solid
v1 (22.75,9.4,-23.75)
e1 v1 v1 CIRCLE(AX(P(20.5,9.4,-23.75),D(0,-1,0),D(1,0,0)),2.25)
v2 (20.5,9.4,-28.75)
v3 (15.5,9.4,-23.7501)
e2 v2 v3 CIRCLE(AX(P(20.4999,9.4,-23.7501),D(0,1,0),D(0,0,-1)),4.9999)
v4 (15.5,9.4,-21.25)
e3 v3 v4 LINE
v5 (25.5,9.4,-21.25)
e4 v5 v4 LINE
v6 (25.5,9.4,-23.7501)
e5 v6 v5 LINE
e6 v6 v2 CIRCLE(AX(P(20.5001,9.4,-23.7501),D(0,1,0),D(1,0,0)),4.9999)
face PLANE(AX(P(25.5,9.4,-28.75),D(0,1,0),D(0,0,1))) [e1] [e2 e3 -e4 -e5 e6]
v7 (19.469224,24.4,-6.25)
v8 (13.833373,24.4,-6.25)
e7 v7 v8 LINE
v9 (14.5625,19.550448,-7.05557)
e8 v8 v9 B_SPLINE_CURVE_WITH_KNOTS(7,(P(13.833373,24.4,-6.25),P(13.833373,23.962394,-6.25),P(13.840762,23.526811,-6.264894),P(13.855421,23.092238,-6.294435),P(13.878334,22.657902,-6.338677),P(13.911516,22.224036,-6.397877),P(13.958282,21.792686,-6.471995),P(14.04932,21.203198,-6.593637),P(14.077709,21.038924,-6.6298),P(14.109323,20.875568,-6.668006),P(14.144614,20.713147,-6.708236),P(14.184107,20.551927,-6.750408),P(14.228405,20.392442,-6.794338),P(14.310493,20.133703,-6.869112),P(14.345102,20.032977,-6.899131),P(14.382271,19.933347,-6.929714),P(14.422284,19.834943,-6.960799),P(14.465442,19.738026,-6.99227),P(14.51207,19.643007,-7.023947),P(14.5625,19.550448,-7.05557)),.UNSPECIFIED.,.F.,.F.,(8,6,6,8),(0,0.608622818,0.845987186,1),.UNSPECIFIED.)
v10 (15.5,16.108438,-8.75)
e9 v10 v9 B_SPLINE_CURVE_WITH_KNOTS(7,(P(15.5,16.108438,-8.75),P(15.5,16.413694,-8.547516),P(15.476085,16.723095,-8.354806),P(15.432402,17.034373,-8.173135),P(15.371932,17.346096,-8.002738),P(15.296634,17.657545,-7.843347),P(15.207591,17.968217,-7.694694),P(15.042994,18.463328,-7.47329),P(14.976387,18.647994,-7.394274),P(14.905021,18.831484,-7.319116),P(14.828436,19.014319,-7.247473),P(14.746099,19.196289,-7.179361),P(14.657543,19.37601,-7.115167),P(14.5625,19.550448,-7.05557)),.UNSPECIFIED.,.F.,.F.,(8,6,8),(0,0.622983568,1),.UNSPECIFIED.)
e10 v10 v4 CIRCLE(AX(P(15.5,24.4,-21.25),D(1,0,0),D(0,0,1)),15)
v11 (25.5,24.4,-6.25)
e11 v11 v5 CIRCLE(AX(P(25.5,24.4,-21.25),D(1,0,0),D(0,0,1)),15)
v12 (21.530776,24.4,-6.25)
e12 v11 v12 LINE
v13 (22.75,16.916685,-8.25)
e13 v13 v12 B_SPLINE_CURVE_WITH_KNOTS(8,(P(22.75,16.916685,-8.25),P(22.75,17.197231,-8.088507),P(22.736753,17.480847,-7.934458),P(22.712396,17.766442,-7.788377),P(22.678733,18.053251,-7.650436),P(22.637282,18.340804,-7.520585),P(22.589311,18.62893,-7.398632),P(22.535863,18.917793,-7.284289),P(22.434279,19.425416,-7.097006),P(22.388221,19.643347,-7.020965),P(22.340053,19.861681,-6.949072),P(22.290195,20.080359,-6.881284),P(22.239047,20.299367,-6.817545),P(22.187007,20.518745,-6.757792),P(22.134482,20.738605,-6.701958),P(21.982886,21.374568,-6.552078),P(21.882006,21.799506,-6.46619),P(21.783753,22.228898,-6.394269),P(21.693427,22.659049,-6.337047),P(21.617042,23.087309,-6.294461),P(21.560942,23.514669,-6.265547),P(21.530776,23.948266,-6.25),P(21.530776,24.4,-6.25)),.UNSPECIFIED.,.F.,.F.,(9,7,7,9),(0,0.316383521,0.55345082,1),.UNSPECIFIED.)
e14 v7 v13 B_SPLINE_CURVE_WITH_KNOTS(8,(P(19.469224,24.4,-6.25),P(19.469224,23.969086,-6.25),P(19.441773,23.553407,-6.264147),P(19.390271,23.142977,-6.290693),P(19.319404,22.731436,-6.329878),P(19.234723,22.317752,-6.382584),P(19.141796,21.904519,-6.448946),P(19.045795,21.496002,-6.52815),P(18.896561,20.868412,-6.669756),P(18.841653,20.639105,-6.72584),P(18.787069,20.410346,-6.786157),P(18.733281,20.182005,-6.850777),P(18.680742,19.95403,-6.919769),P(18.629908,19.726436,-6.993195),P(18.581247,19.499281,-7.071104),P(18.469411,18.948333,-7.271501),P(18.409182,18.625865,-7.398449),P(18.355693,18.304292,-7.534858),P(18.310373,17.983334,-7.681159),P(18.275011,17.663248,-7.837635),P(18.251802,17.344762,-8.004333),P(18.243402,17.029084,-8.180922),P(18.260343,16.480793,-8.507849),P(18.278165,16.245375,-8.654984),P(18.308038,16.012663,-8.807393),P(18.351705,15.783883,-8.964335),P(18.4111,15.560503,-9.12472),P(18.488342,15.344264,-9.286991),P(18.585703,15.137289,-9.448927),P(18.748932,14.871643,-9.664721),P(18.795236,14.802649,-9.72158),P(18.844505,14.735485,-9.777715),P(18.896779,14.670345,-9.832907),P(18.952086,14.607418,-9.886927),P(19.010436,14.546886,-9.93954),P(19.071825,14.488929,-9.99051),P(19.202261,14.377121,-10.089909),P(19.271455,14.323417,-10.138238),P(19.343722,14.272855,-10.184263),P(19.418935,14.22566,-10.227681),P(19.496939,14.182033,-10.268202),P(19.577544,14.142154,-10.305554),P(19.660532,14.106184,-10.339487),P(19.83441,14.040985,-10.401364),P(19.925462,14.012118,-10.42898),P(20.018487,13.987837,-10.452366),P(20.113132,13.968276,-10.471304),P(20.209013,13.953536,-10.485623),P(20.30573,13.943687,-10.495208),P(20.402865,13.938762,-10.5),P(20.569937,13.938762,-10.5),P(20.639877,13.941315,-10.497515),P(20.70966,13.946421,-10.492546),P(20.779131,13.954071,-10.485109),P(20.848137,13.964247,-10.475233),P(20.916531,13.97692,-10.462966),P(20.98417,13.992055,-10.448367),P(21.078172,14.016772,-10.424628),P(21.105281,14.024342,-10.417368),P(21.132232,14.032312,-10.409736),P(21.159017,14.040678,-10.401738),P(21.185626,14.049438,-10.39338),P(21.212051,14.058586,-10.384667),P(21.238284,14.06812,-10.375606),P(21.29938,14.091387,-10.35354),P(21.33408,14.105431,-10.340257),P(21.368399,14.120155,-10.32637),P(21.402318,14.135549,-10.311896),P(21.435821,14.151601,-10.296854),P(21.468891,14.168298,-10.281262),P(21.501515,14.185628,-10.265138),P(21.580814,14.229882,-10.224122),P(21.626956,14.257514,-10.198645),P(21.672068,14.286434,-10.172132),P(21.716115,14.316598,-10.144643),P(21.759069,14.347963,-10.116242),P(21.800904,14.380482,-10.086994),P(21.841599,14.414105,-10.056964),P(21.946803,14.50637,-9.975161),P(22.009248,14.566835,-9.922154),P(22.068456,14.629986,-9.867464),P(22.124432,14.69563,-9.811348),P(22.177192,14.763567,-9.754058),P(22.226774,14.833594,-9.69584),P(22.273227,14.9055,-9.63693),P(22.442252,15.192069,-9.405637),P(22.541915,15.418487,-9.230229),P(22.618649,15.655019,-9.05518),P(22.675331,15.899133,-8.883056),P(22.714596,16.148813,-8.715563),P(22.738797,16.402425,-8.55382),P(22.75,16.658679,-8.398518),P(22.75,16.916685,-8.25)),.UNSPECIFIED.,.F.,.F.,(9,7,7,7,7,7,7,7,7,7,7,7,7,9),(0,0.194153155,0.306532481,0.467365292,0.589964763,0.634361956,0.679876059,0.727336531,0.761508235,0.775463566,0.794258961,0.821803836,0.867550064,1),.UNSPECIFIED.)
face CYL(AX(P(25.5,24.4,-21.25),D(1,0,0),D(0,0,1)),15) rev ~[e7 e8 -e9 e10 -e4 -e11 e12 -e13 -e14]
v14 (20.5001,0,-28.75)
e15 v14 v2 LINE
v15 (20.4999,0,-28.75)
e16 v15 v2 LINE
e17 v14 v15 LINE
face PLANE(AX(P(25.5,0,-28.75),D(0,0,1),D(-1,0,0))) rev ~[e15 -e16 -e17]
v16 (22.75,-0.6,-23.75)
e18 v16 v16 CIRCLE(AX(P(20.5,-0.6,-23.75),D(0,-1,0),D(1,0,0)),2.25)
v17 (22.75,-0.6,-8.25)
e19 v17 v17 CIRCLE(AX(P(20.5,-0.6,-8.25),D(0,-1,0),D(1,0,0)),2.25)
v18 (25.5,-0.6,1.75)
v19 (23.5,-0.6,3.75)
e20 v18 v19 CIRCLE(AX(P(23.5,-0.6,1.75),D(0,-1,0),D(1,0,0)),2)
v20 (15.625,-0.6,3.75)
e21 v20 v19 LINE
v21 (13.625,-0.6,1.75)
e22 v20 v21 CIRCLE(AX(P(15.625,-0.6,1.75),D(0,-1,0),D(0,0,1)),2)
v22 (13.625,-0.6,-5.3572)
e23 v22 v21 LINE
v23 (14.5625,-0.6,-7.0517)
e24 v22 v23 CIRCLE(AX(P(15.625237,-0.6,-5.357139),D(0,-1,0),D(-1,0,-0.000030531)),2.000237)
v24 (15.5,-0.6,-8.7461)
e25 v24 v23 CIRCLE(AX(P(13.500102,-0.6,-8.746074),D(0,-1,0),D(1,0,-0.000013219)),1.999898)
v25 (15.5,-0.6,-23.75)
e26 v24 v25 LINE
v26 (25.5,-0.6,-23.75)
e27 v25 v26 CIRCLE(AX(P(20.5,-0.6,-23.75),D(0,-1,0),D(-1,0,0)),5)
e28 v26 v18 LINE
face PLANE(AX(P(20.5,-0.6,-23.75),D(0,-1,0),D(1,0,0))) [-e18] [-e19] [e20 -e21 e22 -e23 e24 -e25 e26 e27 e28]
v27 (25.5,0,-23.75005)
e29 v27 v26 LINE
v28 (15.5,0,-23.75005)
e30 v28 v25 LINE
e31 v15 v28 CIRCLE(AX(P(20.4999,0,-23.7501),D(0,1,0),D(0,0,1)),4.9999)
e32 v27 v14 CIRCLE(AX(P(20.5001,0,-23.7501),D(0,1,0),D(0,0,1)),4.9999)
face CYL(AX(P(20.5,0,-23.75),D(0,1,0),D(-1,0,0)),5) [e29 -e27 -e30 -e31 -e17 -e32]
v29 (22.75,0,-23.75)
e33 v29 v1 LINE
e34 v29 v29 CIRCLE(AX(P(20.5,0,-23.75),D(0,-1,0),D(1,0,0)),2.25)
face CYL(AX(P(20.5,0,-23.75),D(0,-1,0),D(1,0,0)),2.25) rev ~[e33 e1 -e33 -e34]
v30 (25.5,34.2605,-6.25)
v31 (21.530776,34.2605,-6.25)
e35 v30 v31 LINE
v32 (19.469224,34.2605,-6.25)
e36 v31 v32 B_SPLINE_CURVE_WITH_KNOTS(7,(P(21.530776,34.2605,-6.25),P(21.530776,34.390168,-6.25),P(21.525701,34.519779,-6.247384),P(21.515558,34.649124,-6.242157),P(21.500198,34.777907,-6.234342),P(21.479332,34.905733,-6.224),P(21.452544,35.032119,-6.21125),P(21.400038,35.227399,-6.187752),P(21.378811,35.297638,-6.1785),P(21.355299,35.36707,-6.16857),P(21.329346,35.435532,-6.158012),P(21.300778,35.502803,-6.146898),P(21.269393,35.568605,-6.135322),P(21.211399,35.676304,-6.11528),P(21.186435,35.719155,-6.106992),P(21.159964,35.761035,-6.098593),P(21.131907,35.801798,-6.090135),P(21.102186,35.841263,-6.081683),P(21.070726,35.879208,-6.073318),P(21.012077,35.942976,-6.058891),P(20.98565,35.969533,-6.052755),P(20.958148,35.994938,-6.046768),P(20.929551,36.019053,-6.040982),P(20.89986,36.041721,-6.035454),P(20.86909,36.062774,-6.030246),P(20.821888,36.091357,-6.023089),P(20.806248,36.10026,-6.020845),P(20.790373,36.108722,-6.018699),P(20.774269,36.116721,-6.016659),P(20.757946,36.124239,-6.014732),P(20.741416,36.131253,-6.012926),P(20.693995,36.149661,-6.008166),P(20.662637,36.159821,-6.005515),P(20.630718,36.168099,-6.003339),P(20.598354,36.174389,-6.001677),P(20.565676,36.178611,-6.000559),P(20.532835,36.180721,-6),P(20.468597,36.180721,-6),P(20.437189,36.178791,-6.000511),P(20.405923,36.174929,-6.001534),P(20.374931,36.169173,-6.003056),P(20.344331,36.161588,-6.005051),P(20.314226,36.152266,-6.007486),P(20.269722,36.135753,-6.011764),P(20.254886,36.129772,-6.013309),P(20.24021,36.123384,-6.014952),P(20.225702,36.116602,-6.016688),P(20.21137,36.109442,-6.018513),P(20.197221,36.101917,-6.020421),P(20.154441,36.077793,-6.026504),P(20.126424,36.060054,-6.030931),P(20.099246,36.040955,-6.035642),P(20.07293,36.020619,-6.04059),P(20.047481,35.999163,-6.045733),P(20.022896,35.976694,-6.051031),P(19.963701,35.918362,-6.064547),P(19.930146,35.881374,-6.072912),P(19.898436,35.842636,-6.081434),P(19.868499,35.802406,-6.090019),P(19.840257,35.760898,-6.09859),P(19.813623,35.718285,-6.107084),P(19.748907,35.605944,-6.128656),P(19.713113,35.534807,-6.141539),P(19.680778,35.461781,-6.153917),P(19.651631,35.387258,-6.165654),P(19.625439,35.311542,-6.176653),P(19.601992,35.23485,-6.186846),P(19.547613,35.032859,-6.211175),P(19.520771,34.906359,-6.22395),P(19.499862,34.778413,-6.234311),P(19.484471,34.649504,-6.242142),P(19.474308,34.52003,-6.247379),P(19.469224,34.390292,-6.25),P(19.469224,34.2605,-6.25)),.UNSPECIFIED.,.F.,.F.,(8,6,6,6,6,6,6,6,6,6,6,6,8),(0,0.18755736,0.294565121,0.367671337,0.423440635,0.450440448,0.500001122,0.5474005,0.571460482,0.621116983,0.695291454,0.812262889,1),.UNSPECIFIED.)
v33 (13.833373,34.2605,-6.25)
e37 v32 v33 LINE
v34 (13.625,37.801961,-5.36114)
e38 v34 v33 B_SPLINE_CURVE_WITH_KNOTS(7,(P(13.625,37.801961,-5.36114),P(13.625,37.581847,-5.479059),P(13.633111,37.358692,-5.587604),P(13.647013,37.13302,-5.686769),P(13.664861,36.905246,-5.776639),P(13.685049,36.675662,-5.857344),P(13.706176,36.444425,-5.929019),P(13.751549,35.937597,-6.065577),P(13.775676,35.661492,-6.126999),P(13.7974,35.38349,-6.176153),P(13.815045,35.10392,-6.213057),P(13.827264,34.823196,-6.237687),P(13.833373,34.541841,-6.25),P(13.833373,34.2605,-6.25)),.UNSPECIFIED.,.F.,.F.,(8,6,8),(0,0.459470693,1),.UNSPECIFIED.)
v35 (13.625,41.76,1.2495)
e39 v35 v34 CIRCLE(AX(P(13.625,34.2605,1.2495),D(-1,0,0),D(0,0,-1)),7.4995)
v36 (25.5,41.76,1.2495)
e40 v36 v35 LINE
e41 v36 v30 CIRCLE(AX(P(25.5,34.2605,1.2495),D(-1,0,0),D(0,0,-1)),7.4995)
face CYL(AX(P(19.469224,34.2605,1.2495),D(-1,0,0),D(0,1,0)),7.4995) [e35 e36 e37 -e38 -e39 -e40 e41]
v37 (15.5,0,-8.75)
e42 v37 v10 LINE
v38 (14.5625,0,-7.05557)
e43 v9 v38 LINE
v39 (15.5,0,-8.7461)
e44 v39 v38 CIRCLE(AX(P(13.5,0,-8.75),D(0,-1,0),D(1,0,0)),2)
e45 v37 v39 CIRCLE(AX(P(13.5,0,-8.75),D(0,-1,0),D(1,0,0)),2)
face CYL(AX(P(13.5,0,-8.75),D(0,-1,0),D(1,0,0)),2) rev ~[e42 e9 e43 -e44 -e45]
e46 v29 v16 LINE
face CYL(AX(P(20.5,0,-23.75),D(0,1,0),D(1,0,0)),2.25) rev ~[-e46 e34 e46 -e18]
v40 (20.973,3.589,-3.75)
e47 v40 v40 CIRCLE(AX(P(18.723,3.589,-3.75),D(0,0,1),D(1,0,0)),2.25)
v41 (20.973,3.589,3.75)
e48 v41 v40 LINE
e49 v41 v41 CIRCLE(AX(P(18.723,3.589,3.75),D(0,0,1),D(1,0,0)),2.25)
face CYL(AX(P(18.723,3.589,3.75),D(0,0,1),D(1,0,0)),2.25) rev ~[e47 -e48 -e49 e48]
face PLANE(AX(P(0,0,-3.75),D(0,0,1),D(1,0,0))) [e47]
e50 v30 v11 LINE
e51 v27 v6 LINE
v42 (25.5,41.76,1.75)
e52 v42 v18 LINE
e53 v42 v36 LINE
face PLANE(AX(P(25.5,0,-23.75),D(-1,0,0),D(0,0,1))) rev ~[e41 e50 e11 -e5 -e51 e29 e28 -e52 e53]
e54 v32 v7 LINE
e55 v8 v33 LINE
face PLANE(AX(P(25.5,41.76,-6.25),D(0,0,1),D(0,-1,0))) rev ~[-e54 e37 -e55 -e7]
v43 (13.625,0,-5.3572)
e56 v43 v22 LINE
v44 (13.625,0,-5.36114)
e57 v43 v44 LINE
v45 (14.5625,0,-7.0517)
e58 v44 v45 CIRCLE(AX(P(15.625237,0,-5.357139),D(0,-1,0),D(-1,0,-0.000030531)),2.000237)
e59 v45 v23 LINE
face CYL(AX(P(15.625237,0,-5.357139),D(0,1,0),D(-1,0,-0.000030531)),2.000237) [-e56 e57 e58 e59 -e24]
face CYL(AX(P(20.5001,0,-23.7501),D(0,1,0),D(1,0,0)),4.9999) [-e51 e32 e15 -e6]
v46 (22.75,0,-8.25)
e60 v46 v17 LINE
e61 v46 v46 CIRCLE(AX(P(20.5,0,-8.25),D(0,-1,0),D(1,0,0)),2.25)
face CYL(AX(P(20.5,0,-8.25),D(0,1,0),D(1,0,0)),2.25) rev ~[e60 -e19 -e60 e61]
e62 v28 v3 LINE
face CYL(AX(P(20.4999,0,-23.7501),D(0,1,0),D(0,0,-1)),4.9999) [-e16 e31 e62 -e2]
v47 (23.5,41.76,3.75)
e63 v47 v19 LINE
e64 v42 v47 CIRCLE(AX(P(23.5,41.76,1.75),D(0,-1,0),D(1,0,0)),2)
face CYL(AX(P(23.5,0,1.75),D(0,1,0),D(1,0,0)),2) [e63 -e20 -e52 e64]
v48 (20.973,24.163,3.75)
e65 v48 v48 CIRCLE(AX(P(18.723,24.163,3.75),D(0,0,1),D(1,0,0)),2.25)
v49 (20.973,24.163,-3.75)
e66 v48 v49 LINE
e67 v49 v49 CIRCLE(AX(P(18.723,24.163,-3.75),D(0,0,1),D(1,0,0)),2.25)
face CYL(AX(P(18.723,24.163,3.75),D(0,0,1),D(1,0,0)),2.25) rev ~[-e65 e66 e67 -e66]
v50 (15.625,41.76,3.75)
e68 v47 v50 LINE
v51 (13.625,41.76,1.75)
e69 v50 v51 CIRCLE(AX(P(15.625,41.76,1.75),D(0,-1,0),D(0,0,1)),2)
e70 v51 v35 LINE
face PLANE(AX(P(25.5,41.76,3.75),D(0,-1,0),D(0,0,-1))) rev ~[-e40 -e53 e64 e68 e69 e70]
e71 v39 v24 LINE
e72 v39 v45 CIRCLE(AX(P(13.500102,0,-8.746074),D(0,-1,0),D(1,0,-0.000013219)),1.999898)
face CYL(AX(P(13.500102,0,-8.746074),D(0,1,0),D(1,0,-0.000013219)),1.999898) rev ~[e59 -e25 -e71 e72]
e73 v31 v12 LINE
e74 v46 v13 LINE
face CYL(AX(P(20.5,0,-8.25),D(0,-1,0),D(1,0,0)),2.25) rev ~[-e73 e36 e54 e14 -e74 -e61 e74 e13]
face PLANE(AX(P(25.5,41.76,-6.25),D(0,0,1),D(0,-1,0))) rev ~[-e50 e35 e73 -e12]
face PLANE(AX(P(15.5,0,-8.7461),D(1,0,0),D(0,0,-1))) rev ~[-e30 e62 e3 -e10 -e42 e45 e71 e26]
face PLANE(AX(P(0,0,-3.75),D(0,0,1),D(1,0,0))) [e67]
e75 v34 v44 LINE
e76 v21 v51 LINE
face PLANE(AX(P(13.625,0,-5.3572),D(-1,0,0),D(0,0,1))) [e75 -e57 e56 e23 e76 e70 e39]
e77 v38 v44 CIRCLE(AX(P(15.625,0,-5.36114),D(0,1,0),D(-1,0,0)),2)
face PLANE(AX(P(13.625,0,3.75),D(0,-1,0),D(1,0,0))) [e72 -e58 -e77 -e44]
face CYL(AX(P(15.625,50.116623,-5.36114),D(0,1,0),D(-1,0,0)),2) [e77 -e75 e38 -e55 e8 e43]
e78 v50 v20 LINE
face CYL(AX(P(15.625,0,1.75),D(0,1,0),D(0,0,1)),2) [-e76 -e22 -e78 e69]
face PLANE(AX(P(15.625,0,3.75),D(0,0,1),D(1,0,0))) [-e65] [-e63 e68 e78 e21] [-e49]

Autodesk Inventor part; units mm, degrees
ref_plane "YZ Plane" through (0, 0, 0) normal (1, 0, 0) x (0, 1, 0)
ref_plane "XZ Plane" through (0, 0, 0) normal (0, 1, 0) x (-1, 0, 0)
ref_plane "XY Plane" through (0, 0, 0) normal (0, 0, 1) x (1, 0, 0)
sketch "スケッチ1" plane through (0, 0, 0) normal (0, 0, 1) x (1, 0, 0)
  line L0 (0, 0) -> (25.5, 0)
  line L1 (25.5, 0) -> (25.5, 41.76)
  line L2 (25.5, 41.76) -> (0, 41.76)
  line L3 (0, 41.76) -> (0, 0)
  line L4 (0, 3) -> (25.5, 3) construction
  line L5 (13.5, 41.76) -> (13.5, 0) construction
  line L6 (12, 41.76) -> (12, 0) construction
  line L7 (12, 7.267) -> (13.5, 7.267)
  line L8 (13.5, 7.267) -> (13.5, 17.554)
  line L9 (13.5, 17.554) -> (12, 17.554)
  line L10 (12, 17.554) -> (12, 7.267)
  line L11 (12, 27.612) -> (13.5, 27.612)
  line L12 (13.5, 27.612) -> (13.5, 37.899)
  line L13 (13.5, 37.899) -> (12, 37.899)
  line L14 (12, 37.899) -> (12, 27.612)
  dimension "d0" = 3
  dimension "d1" = 38.76
  dimension "d2" = 1.5
  dimension "d3" = 12
  dimension "d4" = 25.5
  dimension "d5" = 4.267
  dimension "d6" = 10.287
  dimension "d7" = 10.058
  dimension "d8" = 10.287
  dimension "d11" = 12
extrude "押し出し1" add sketch "スケッチ1" along normal mid plane 7.5
sketch "スケッチ2" plane through (0, 0, -3.75) normal (0, -1, 0) x (1, 0, 0)
  line L0 (25.5, 7.5) -> (0, 7.5) projected
  line L1 (0, 7.5) -> (25.5, 7.5)
  line L2 (25.5, 7.5) -> (25.5, 2.5)
  line L3 (25.5, -2.5) -> (20.5, -2.5)
  line L4 (0, -2.5) -> (0, 2.5)
  line L5 (25.5, 2.5) -> (0, 2.5) construction
  line L6 (0, 3.75) -> (0, 7.5) construction
  arc A0 (0, 2.5) -> (5, -2.5) centre (5, 2.5) ccw
  line L7 (5, 2.5) -> (5, -2.5) construction
  line L8 (5, 2.5) -> (0, 2.5) construction
  arc A1 (20.5, -2.5) -> (25.5, 2.5) centre (20.5, 2.5) ccw
  line L9 (20.5, 2.5) -> (20.5, -2.5) construction
  line L10 (20.5, 2.5) -> (25.5, 2.5) construction
  line L11 (25.5, 0) -> (25.5, 7.5) projected
  line L12 (0, 2.5) -> (0, 7.5)
  line L13 (5, -2.5) -> (0, -2.5)
  line L14 (20.5, -2.5) -> (5, -2.5)
  line L15 (25.5, 2.5) -> (25.5, -2.5)
  dimension "d12" = 90
  dimension "d13" = 90
  dimension "d14" = 10
  dimension "d15" = 5
extrude "押し出し2" add sketch "スケッチ2" against normal up to surface (7.267 mm away)
extrude "押し出し3" [suppressed]
ref_plane "作業平面1" through (0, 0, -1.25) normal (0, 0, 1) x (1, 0, 0)
sketch "スケッチ3" plane through (0, 0, 3.75) normal (0, -1, 0) x (1, 0, 0)
  arc A0 (0, -5) -> (5, -10) centre (5, -5) ccw construction
  arc A1 (20.5, -10) -> (25.5, -5) centre (20.5, -5) ccw construction
  circle A2 centre (5, -5) radius 2.25
  circle A3 centre (20.5, -5) radius 2.25
  point P0 (0, -3.75)
  dimension "d20" = 4.5
  dimension "d21" = 4.5
extrude "押し出し4" cut sketch "スケッチ3" against normal up to surface (41.76 mm away)
sketch "スケッチ4" plane through (0.6699, 41.76, -3.75) normal (0, 1, 0) x (1, 0, 0)
  circle A0 centre (19.8301, -2.5) radius 2.25 construction
  circle A1 centre (4.3301, -2.5) radius 2.25 construction
  line L0 (0, 0) -> (24.1603, 0) projected
  line L1 (19.8301, 0) -> (19.8301, -2.5) construction
  line L2 (17.5801, 0) -> (17.5801, -2.5)
  line L3 (22.0801, -2.5) -> (22.0801, 0)
  arc A2 (22.0801, 0) -> (17.5801, 0) centre (19.8301, 0) ccw
  arc A3 (17.5801, -2.5) -> (22.0801, -2.5) centre (19.8301, -2.5) ccw
  line L4 (4.3301, -0.25) -> (4.3301, -2.5) construction
  line L5 (2.0801, -0.25) -> (2.0801, -2.5)
  line L6 (6.5801, -2.5) -> (6.5801, -0.25)
  arc A4 (6.5801, -0.25) -> (2.0801, -0.25) centre (4.3301, -0.25) ccw
  arc A5 (2.0801, -2.5) -> (6.5801, -2.5) centre (4.3301, -2.5) ccw
  point P0 (-0.6699, -3.75)
  point P1 (19.8301, -1.25)
  point P2 (4.3301, -1.375)
extrude "押し出し5" [suppressed]
sketch "スケッチ5" plane through (12, 7.267, 3.75) normal (1, 0, 0) x (0, 0, -1)
  line L0 (0, 0) -> (7.5, 0) construction
  line L1 (7.5, 10.287) -> (0, 10.287) construction
  line L2 (7.5, 10.287) -> (10, 12.787)
  line L3 (10, 12.787) -> (10, -2.5)
  line L4 (10, -2.5) -> (7.5, 0)
  line L5 (7.5, 0) -> (7.5, 10.287)
  line L6 (10, -7.267) -> (10, 0) projected
  point P0 (3.75, -7.267)
  dimension "d28" = 135
  dimension "d29" = 135
sketch "スケッチ6" plane through (0, 0, 3.75) normal (0, 0, 1) x (1, 0, 0)
  line L0 (12, 27.612) -> (12, 37.899) construction
  line L1 (12, 37.899) -> (13.5, 37.899) construction
  line L2 (13.5, 37.899) -> (13.5, 27.612) construction
  line L3 (13.5, 27.612) -> (12, 27.612) construction
  line L4 (12, 7.267) -> (12, 17.554) construction
  line L5 (12, 17.554) -> (13.5, 17.554) construction
  line L6 (13.5, 17.554) -> (13.5, 7.267) construction
  line L7 (13.5, 7.267) -> (12, 7.267) construction
  line L8 (0, 0) -> (25.5, 0) construction
  line L9 (25.5, 41.76) -> (0, 41.76) construction
  line L10 (13.625, 27.487) -> (13.625, 38.024)
  line L11 (13.625, 38.024) -> (11.875, 38.024)
  line L12 (11.875, 38.024) -> (11.875, 27.487)
  line L13 (11.875, 27.487) -> (13.625, 27.487)
  line L14 (13.625, 7.142) -> (13.625, 17.679)
  line L15 (13.625, 17.679) -> (11.875, 17.679)
  line L16 (11.875, 17.679) -> (11.875, 7.142)
  line L17 (11.875, 7.142) -> (13.625, 7.142)
  line L18 (0, 41.76) -> (0, 0) projected
  line L19 (25.5, 0) -> (25.5, 41.76) projected
  dimension "d32" = 0.125
  dimension "d33" = 0.125
extrude "押し出し7" cut sketch "スケッチ6" against normal through all
sketch "スケッチ8" plane through (0, 0, 3.75) normal (0, -1, 0) x (1, 0, 0)
  line L0 (13.625, 0) -> (13.625, -10) construction
  line L1 (0, 0) -> (0, -10) projected
  line L2 (0, 0) -> (13.625, 0)
  line L3 (13.625, 0) -> (13.625, -10)
  line L4 (13.625, -10) -> (0, -10)
  line L5 (0, -10) -> (0, 0)
  point P0 (0, -3.75)
extrude "押し出し10" cut sketch "スケッチ8" against normal up to surface (41.76 mm away)
sketch "スケッチ9" plane through (25.5, 7.267, -3.75) normal (0, 1, 0) x (1, 0, 0)
  line L0 (-11.875, 2.5) -> (-11.875, 0) projected
  line L1 (0, 0) -> (-11.875, 0) projected
  line L2 (0, 0) -> (0, 2.5) projected
  line L3 (0, 2.5) -> (-11.875, 2.5) projected
  point P0 (-25.5, -3.75)
extrude "押し出し11" add sketch "スケッチ9" along normal up to surface (34.493 mm away)
sketch "スケッチ10" plane through (25.5, 0, -6.25) normal (0, -1, 0) x (1, 0, 0)
  line L0 (-11.875, 0) -> (0, 0) projected
  line L1 (-11.875, 0) -> (0, 0)
  line L2 (0, 0) -> (0, -22.5)
  line L3 (0, -22.5) -> (-11.875, -22.5)
  line L4 (-11.875, -22.5) -> (-11.875, 0)
  circle A0 centre (-5, 5) radius 2.25 construction
  line L5 (-5, 5) -> (-5, -17.5) construction
  circle A1 centre (-5, -17.5) radius 2.25
  point P0 (-25.5, 6.25)
  dimension "d46" = 22.5
  dimension "d47" = 5
  dimension "d48" = 5
extrude "押し出し12" add sketch "スケッチ10" against normal up to surface (41.76 mm away)
sketch "スケッチ12" plane through (13.625, 0, 3.75) normal (0, -1, 0) x (1, 0, 0)
  circle A0 centre (6.875, -5) radius 2.25 projected
  point P0 (-13.625, -3.75)
extrude "押し出し14" add sketch "スケッチ12" against normal up to surface (41.76 mm away)
sketch "スケッチ11" plane through (0, 0, 3.75) normal (0, 0, 1) x (1, 0, 0)
  line L0 (22.75, 0) -> (18.25, 0) construction
  line L1 (18.723, 0) -> (18.723, 3.589) construction
  circle A0 centre (18.723, 3.589) radius 2.25
  line L2 (13.625, 41.76) -> (13.625, 0) projected
  line L3 (18.723, 3.589) -> (18.723, 24.163) construction
  line L4 (18.25, 0) -> (18.25, 41.76) construction
  circle A1 centre (18.723, 24.163) radius 2.25
  point P0 (0, 0)
  dimension "d51" = 4.5
  dimension "d52" = 3.589
  dimension "d53" = 5.098
  dimension "d54" = 20.574
extrude "押し出し13" cut sketch "スケッチ11" against normal blind 7.5
sketch "スケッチ13" plane through (13.625, 0, 3.75) normal (0, -1, 0) x (1, 0, 0)
  circle A0 centre (6.875, -27.5) radius 2.25 construction
  line L0 (6.875, -27.5) -> (6.875, -12) construction
  circle A1 centre (6.875, -12) radius 2.25
  point P0 (-13.625, -3.75)
  dimension "d59" = 15.5
extrude "押し出し15" cut sketch "スケッチ13" against normal up to surface (41.76 mm away)
sketch "スケッチ14" plane through (13.625, 0, 3.75) normal (0, -1, 0) x (1, 0, 0)
  line L0 (2.848, -7.5) -> (7.348, -7.5) construction
  line L1 (2.848, 0) -> (7.348, 0) construction
  line L2 (0, -32.5) -> (0, 0) projected
  line L3 (0, -32.5) -> (1.875, -32.5)
  line L4 (1.875, -32.5) -> (1.875, -10.5)
  line L5 (1.875, -10.5) -> (0, -10.5)
  line L6 (0, -10.5) -> (0, -32.5)
  circle A0 centre (6.875, -27.5) radius 2.25 projected
  point P0 (-13.625, -3.75)
  dimension "d62" = 3
  dimension "d63" = 5
extrude "押し出し16" cut sketch "スケッチ14" against normal up to surface (41.76 mm away) contours L2 L5 L4 L3
fillet "フィレット4" radius 2 1 edges at (15.5, 20.88, -6.75)
fillet "フィレット5" radius 5 2 edges at (25.5, 20.88, -28.75) (15.5, 20.88, -28.75)
sketch "スケッチ16" plane through (13.625, 41.76, 3.75) normal (0, 1, 0) x (1, 0, 0)
  arc A0 (11.875, 27.5) -> (1.875, 27.5) centre (6.875, 27.5) ccw projected
  line L0 (1.875, 27.5) -> (1.875, 12.4961) projected
  arc A1 (0, 10.5) -> (1.875, 12.4961) centre (-0.125, 12.4961) ccw projected
  line L1 (0, 10.5) -> (0, 0) projected
  line L2 (11.875, 0) -> (0, 0) projected
  line L3 (11.875, 27.5) -> (11.875, 0) projected
  circle A2 centre (6.875, 27.5) radius 2.25 projected
  circle A3 centre (6.875, 12) radius 2.25 projected
  point P0 (-13.625, 3.75)
extrude "押し出し17" add sketch "スケッチ16" along normal blind 7.928
sketch "スケッチ17" plane through (0, 0, 3.75) normal (0, 0, 1) x (1, 0, 0)
  circle A0 centre (18.723, 3.589) radius 2.25 construction
  circle A1 centre (18.723, 24.163) radius 2.25 construction
  line L0 (18.723, 3.589) -> (18.723, 24.163) construction
  line L1 (18.25, 0) -> (18.25, 49.688) construction
  line L2 (18.723, 24.163) -> (18.723, 44.737) construction
  line L3 (18.723, 44.737) -> (18.723, 65.311) construction
  circle A2 centre (18.723, 44.737) radius 2.25
  circle A3 centre (18.723, 65.311) radius 2.25
  point P0 (0, 0)
extrude "押し出し18" cut sketch "スケッチ17" against normal blind 7.5
fillet "フィレット6" radius 2 1 edges at (13.625, 20.88, -6.7539)
fillet "フィレット7" radius 2 2 edges at (13.625, 24.844, 3.75) (25.5, 24.844, 3.75)
sketch "スケッチ18" plane through (25.5, 0, -23.75) normal (1, 0, 0) x (0, 0, -1)
  line L0 (-27.5, 49.688) -> (-27.5, 0) projected
  line L1 (-27.5, 41.76) -> (-7.75, 41.76)
  line L2 (0, 0) -> (-25.5, 0) projected
  arc A0 (5, 29.01) -> (-7.75, 41.76) centre (-7.75, 29.01) ccw
  line L3 (-7.75, 29.01) -> (5, 29.01) construction
  line L4 (-7.75, 29.01) -> (-7.75, 41.76) construction
  line L5 (-27.5, 41.76) -> (-27.5, 50.688)
  line L6 (-27.5, 50.688) -> (6, 50.688)
  line L7 (6, 50.688) -> (6, 29.01)
  line L8 (6, 29.01) -> (5, 29.01)
  line L9 (-25.5, 49.688) -> (0, 49.688) projected
  line L10 (5, 0) -> (5, 49.688) construction
  point P0 (-23.75, 0)
  dimension "d75" = 41.76
  dimension "d76" = 90
  dimension "d77" = 12.75
  dimension "d78" = 1
  dimension "d79" = 6
extrude "押し出し19" cut sketch "スケッチ18" against normal up to surface (11.875 mm away)
sketch "スケッチ19" plane through (20.5, 0, -23.75) normal (0, -1, 0) x (1, 0, 0)
  arc A0 (5, 25.5) -> (3, 27.5) centre (3, 25.5) ccw projected
  line L0 (-4.875, 27.5) -> (3, 27.5) projected
  arc A1 (-4.875, 27.5) -> (-6.875, 25.5) centre (-4.875, 25.5) ccw projected
  line L1 (-6.875, 18.3928) -> (-6.875, 25.5) projected
  arc A2 (-6.875, 18.3928) -> (-5.9375, 16.6983) centre (-4.875, 18.3928) ccw projected
  arc A3 (-5, 15.0039) -> (-5.9375, 16.6983) centre (-7, 15.0039) ccw projected
  line L2 (-5, 15.0039) -> (-5, 0) projected
  arc A4 (-5, 0) -> (5, 0) centre (0, 0) ccw projected
  line L3 (5, 0) -> (5, 25.5) projected
  circle A5 centre (0, 0) radius 2.25 projected
  circle A6 centre (0, 15.5) radius 2.25 projected
  point P0 (-20.5, 23.75)
extrude "押し出し20" add sketch "スケッチ19" along normal blind 0.6
sketch "スケッチ20" plane through (25.5, 41.76, 1.75) normal (1, 0, 0) x (0, 0, -1)
  line L0 (8, 0) -> (30.5, 0)
  line L1 (30.5, 0) -> (30.5, -32.36)
  line L2 (30.5, -32.36) -> (23, -32.36)
  line L3 (8, 0) -> (8, -17.36)
  line L4 (7.1072, 0) -> (7.1072, -42.36) projected
  arc A0 (8, -17.36) -> (23, -32.36) centre (23, -17.36) ccw
  line L5 (-2, 0) -> (-2, -42.36) projected
  line L6 (25.5, -42.36) -> (30.5, -42.36) projected
  line L7 (30.5, -42.36) -> (30.5, -12.75) construction
  line L8 (17.75, 0) -> (0, 0) construction
  point P0 (1.75, -41.76)
  dimension "d84" = 10
  dimension "d85" = 10
  dimension "d86" = 15
extrude "押し出し21" cut sketch "スケッチ20" against normal up to surface (11.875 mm away)
fillet "フィレット8" radius 7.5 1 edges at (16.6513, 41.76, -6.25)
equation "\"d8\" = d6"
equation "\"d11\" = d3"
equation "\"d29\" = d28"
equation "\"d33\" = d32"
equation "\"d48\" = d47"
properties part number "small_gpu_02" material "アルミニウム 6061"
